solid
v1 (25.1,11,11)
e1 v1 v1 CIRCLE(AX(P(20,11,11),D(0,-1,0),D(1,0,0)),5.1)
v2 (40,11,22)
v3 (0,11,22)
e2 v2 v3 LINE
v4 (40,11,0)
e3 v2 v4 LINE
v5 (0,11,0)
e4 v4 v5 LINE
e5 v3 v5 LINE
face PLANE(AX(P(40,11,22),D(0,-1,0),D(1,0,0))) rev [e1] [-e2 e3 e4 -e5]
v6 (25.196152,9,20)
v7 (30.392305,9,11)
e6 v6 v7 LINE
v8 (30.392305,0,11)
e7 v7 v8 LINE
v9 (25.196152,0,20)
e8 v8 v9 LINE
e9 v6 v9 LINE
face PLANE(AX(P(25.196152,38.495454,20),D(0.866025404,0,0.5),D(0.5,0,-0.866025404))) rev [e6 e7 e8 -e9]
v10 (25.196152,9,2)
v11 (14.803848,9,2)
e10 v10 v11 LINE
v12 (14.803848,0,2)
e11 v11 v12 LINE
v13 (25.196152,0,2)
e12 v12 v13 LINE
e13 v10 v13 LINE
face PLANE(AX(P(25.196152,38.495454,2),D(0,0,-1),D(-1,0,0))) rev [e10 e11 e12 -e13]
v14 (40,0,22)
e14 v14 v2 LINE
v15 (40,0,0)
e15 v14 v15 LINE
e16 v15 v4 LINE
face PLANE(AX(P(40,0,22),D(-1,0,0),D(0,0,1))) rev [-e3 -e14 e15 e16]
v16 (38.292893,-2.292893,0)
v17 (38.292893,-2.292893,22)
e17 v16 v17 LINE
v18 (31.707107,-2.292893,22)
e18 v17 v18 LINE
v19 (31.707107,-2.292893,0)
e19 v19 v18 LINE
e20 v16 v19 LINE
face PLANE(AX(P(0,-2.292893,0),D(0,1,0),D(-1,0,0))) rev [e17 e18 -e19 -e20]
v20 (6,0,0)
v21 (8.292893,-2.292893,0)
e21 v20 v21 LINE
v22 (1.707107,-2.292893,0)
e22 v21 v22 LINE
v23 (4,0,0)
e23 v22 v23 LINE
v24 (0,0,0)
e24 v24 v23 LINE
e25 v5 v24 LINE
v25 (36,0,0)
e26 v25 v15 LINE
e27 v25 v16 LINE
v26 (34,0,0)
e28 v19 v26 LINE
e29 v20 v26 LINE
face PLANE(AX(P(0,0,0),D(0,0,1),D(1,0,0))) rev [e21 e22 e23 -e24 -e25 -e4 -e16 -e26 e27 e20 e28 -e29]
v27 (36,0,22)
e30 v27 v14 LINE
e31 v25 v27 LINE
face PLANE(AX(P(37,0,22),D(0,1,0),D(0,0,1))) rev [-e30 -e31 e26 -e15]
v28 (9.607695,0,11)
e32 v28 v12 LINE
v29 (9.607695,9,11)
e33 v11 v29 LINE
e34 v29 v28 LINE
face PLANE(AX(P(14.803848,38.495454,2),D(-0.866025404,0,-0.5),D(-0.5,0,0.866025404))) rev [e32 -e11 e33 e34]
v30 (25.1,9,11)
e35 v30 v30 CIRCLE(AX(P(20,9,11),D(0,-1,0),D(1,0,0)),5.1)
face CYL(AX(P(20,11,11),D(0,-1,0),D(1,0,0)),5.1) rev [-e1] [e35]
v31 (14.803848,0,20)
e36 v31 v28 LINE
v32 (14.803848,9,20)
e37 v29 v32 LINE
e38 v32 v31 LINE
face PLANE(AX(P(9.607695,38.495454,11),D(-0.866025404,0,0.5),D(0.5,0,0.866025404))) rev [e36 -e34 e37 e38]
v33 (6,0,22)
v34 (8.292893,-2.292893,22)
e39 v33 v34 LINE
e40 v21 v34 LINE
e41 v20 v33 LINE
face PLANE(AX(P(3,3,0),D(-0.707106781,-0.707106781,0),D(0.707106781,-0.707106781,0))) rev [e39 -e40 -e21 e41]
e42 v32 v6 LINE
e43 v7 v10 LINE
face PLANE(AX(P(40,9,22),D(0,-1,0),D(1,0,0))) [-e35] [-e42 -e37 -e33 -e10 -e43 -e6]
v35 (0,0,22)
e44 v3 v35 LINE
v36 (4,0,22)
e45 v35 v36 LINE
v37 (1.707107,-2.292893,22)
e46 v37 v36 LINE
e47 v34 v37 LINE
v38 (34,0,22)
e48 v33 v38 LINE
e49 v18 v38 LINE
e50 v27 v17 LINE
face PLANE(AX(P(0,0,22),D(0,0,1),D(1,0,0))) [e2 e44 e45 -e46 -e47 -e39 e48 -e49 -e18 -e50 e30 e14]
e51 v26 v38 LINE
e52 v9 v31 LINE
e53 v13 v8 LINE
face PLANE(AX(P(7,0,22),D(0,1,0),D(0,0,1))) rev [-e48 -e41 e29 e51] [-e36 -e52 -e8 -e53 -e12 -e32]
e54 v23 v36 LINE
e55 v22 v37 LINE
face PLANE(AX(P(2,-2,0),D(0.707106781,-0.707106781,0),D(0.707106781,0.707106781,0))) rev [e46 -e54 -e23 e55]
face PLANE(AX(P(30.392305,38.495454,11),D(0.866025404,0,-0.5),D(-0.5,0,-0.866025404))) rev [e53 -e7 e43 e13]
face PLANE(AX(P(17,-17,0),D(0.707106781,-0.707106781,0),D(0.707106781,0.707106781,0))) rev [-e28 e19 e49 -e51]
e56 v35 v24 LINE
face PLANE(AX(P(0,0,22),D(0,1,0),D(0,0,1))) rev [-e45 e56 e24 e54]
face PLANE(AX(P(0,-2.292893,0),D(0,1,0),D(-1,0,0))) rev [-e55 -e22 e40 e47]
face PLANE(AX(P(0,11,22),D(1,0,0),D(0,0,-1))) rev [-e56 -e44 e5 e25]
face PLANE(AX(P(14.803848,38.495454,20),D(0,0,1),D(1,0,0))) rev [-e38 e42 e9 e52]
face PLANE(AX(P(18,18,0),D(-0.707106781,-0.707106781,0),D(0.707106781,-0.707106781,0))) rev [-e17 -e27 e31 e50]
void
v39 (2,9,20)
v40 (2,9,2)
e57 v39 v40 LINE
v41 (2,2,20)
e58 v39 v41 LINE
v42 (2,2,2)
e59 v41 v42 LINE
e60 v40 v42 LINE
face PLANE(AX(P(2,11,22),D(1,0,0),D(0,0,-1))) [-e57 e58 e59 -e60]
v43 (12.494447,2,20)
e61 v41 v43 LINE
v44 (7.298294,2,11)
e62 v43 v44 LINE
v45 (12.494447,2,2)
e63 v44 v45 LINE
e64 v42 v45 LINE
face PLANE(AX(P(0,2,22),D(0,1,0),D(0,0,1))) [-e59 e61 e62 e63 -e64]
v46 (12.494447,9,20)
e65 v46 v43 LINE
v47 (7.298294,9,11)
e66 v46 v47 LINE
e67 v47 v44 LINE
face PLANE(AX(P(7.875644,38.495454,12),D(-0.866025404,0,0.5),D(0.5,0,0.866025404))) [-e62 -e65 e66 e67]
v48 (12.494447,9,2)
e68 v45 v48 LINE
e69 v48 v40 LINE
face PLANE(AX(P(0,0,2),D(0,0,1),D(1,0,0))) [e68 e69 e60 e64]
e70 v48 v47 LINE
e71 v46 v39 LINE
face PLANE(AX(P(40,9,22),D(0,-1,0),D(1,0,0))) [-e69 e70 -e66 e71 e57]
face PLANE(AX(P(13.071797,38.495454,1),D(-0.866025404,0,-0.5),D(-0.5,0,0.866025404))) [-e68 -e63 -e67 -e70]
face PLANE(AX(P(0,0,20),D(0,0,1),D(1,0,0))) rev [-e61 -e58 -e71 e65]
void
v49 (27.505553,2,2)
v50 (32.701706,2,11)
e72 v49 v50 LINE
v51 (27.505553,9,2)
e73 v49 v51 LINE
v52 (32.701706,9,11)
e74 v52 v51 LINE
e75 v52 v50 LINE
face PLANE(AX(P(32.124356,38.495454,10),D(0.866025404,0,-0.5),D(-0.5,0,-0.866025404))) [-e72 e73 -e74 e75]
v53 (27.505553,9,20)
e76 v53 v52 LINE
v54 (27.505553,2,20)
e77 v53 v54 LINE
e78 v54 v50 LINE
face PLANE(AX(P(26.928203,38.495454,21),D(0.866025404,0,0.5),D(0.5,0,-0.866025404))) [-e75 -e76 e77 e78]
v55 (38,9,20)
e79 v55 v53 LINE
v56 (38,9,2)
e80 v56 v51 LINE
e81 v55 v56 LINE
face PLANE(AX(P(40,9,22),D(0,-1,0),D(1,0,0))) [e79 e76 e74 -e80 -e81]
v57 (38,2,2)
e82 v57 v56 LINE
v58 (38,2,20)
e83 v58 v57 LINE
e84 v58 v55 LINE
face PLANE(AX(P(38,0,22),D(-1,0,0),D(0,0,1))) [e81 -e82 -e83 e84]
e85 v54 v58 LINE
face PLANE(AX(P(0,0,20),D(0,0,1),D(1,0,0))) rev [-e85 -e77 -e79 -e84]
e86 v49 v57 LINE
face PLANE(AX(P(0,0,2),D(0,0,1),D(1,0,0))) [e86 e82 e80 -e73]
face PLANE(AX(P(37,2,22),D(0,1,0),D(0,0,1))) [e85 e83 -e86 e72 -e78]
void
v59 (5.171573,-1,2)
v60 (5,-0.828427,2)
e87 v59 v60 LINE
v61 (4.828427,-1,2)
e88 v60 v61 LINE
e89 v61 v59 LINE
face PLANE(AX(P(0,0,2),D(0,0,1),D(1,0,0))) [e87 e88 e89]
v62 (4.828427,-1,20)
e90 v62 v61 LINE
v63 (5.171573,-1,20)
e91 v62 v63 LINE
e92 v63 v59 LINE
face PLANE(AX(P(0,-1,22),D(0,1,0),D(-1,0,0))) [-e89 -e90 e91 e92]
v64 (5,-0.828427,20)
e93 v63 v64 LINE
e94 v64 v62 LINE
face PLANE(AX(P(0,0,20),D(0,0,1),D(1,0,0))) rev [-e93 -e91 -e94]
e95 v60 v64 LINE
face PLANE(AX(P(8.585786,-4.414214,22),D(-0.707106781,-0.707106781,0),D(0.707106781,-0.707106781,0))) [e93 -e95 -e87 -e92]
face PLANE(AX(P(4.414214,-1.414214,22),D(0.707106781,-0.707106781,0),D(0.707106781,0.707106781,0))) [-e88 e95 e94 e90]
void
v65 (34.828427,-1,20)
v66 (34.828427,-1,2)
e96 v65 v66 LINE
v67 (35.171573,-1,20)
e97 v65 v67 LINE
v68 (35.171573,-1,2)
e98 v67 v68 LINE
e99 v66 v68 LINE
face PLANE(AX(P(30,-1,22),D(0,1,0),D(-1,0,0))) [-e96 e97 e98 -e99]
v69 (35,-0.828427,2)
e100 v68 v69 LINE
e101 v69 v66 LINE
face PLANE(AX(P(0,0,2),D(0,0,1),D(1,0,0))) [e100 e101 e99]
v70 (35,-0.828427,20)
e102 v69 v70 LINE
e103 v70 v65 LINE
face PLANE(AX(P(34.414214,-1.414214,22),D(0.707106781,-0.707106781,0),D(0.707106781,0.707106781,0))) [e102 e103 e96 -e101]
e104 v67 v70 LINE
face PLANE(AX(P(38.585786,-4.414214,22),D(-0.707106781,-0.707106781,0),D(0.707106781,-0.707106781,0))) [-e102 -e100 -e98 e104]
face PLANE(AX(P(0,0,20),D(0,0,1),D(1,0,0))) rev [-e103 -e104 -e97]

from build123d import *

# Parameters (mm, degrees)
BOSS_EXTRUDE1_DEPTH = 22
CUT_EXTRUDE1_DEPTH  = 9
SKETCH3_R           = 5.1
CUT_EXTRUDE2_DEPTH  = 48.201694885
SHELL2_START        = 2
SHELL2_DEPTH        = 7
SHELL2_2_DEPTH      = 18
CUT_EXTRUDE4_DEPTH  = 47.957427527


# Read off the part's stored shape, not the designer's step: Shell2
with BuildPart() as part:
    # Sketch1 → Boss-Extrude1 (new body)
    with BuildSketch(Plane.XY):
        Polygon((0, 0), (3, 0), (0, -3), (10, -3), (7, 0), (33, 0), (30, -3), (40, -3), (37, 0), (40, 0), (40, 11), (0, 11), align=None)
    extrude(amount=BOSS_EXTRUDE1_DEPTH)

    # Sketch2 → Cut-Extrude1 (cut)
    with BuildSketch(Plane(origin=(0, 0, 0), x_dir=(-1, 0, 0), z_dir=(0, -1, 0))):
        Polygon((-14.803847577, -20), (-25.196152423, -20), (-30.392304845, -11), (-25.196152423, -2), (-14.803847577, -2), (-9.607695155, -11), align=None)
    extrude(amount=-CUT_EXTRUDE1_DEPTH, mode=Mode.SUBTRACT)

    # Sketch3 → Cut-Extrude2 (cut, through all)
    with BuildSketch(Plane(origin=(0, 9, 0), x_dir=(-1, 0, 0), z_dir=(0, -1, 0))):
        with Locations(Location((-20, -11, 0), (0, 0, 180))):
            Circle(SKETCH3_R)
    extrude(amount=-CUT_EXTRUDE2_DEPTH, mode=Mode.SUBTRACT)

    # Shell2 outline → Shell2 (cut)
    with BuildSketch(Plane(origin=(0, 0, 0), x_dir=(1, 0, 0), z_dir=(0, 1, 0)).offset(SHELL2_START)):
        Polygon((2, -2), (2, -20), (12.494446501, -20), (7.298294078, -11), (12.494446501, -2), align=None)
        Polygon((32.701705922, -11), (27.505553499, -20), (38, -20), (38, -2), (27.505553499, -2), align=None)
    extrude(amount=SHELL2_DEPTH, mode=Mode.SUBTRACT)

    # Shell2 2 outline → Shell2 2 (cut)
    with BuildSketch(Plane.XY.offset(SHELL2_START)):
        Polygon((5.171572875, -1), (5, -0.828427125), (4.828427125, -1), align=None)
        Polygon((34.828427125, -1), (35.171572875, -1), (35, -0.828427125), align=None)
    extrude(amount=SHELL2_2_DEPTH, mode=Mode.SUBTRACT)

    # Sketch6 → Cut-Extrude4 (cut, through all)
    with BuildSketch(Plane.XY.offset(22)):
        Polygon((31.707106781, -2.292893219), (34, 0), (33, 0), (30, -3), (40, -3), (37, 0), (36, 0), (38.292893219, -2.292893219), align=None)
        Polygon((1.707106781, -2.292893219), (4, 0), (3, 0), (0, -3), (10, -3), (7, 0), (6, 0), (8.292893219, -2.292893219), align=None)
    extrude(amount=-CUT_EXTRUDE4_DEPTH, mode=Mode.SUBTRACT)


solid = part.part
